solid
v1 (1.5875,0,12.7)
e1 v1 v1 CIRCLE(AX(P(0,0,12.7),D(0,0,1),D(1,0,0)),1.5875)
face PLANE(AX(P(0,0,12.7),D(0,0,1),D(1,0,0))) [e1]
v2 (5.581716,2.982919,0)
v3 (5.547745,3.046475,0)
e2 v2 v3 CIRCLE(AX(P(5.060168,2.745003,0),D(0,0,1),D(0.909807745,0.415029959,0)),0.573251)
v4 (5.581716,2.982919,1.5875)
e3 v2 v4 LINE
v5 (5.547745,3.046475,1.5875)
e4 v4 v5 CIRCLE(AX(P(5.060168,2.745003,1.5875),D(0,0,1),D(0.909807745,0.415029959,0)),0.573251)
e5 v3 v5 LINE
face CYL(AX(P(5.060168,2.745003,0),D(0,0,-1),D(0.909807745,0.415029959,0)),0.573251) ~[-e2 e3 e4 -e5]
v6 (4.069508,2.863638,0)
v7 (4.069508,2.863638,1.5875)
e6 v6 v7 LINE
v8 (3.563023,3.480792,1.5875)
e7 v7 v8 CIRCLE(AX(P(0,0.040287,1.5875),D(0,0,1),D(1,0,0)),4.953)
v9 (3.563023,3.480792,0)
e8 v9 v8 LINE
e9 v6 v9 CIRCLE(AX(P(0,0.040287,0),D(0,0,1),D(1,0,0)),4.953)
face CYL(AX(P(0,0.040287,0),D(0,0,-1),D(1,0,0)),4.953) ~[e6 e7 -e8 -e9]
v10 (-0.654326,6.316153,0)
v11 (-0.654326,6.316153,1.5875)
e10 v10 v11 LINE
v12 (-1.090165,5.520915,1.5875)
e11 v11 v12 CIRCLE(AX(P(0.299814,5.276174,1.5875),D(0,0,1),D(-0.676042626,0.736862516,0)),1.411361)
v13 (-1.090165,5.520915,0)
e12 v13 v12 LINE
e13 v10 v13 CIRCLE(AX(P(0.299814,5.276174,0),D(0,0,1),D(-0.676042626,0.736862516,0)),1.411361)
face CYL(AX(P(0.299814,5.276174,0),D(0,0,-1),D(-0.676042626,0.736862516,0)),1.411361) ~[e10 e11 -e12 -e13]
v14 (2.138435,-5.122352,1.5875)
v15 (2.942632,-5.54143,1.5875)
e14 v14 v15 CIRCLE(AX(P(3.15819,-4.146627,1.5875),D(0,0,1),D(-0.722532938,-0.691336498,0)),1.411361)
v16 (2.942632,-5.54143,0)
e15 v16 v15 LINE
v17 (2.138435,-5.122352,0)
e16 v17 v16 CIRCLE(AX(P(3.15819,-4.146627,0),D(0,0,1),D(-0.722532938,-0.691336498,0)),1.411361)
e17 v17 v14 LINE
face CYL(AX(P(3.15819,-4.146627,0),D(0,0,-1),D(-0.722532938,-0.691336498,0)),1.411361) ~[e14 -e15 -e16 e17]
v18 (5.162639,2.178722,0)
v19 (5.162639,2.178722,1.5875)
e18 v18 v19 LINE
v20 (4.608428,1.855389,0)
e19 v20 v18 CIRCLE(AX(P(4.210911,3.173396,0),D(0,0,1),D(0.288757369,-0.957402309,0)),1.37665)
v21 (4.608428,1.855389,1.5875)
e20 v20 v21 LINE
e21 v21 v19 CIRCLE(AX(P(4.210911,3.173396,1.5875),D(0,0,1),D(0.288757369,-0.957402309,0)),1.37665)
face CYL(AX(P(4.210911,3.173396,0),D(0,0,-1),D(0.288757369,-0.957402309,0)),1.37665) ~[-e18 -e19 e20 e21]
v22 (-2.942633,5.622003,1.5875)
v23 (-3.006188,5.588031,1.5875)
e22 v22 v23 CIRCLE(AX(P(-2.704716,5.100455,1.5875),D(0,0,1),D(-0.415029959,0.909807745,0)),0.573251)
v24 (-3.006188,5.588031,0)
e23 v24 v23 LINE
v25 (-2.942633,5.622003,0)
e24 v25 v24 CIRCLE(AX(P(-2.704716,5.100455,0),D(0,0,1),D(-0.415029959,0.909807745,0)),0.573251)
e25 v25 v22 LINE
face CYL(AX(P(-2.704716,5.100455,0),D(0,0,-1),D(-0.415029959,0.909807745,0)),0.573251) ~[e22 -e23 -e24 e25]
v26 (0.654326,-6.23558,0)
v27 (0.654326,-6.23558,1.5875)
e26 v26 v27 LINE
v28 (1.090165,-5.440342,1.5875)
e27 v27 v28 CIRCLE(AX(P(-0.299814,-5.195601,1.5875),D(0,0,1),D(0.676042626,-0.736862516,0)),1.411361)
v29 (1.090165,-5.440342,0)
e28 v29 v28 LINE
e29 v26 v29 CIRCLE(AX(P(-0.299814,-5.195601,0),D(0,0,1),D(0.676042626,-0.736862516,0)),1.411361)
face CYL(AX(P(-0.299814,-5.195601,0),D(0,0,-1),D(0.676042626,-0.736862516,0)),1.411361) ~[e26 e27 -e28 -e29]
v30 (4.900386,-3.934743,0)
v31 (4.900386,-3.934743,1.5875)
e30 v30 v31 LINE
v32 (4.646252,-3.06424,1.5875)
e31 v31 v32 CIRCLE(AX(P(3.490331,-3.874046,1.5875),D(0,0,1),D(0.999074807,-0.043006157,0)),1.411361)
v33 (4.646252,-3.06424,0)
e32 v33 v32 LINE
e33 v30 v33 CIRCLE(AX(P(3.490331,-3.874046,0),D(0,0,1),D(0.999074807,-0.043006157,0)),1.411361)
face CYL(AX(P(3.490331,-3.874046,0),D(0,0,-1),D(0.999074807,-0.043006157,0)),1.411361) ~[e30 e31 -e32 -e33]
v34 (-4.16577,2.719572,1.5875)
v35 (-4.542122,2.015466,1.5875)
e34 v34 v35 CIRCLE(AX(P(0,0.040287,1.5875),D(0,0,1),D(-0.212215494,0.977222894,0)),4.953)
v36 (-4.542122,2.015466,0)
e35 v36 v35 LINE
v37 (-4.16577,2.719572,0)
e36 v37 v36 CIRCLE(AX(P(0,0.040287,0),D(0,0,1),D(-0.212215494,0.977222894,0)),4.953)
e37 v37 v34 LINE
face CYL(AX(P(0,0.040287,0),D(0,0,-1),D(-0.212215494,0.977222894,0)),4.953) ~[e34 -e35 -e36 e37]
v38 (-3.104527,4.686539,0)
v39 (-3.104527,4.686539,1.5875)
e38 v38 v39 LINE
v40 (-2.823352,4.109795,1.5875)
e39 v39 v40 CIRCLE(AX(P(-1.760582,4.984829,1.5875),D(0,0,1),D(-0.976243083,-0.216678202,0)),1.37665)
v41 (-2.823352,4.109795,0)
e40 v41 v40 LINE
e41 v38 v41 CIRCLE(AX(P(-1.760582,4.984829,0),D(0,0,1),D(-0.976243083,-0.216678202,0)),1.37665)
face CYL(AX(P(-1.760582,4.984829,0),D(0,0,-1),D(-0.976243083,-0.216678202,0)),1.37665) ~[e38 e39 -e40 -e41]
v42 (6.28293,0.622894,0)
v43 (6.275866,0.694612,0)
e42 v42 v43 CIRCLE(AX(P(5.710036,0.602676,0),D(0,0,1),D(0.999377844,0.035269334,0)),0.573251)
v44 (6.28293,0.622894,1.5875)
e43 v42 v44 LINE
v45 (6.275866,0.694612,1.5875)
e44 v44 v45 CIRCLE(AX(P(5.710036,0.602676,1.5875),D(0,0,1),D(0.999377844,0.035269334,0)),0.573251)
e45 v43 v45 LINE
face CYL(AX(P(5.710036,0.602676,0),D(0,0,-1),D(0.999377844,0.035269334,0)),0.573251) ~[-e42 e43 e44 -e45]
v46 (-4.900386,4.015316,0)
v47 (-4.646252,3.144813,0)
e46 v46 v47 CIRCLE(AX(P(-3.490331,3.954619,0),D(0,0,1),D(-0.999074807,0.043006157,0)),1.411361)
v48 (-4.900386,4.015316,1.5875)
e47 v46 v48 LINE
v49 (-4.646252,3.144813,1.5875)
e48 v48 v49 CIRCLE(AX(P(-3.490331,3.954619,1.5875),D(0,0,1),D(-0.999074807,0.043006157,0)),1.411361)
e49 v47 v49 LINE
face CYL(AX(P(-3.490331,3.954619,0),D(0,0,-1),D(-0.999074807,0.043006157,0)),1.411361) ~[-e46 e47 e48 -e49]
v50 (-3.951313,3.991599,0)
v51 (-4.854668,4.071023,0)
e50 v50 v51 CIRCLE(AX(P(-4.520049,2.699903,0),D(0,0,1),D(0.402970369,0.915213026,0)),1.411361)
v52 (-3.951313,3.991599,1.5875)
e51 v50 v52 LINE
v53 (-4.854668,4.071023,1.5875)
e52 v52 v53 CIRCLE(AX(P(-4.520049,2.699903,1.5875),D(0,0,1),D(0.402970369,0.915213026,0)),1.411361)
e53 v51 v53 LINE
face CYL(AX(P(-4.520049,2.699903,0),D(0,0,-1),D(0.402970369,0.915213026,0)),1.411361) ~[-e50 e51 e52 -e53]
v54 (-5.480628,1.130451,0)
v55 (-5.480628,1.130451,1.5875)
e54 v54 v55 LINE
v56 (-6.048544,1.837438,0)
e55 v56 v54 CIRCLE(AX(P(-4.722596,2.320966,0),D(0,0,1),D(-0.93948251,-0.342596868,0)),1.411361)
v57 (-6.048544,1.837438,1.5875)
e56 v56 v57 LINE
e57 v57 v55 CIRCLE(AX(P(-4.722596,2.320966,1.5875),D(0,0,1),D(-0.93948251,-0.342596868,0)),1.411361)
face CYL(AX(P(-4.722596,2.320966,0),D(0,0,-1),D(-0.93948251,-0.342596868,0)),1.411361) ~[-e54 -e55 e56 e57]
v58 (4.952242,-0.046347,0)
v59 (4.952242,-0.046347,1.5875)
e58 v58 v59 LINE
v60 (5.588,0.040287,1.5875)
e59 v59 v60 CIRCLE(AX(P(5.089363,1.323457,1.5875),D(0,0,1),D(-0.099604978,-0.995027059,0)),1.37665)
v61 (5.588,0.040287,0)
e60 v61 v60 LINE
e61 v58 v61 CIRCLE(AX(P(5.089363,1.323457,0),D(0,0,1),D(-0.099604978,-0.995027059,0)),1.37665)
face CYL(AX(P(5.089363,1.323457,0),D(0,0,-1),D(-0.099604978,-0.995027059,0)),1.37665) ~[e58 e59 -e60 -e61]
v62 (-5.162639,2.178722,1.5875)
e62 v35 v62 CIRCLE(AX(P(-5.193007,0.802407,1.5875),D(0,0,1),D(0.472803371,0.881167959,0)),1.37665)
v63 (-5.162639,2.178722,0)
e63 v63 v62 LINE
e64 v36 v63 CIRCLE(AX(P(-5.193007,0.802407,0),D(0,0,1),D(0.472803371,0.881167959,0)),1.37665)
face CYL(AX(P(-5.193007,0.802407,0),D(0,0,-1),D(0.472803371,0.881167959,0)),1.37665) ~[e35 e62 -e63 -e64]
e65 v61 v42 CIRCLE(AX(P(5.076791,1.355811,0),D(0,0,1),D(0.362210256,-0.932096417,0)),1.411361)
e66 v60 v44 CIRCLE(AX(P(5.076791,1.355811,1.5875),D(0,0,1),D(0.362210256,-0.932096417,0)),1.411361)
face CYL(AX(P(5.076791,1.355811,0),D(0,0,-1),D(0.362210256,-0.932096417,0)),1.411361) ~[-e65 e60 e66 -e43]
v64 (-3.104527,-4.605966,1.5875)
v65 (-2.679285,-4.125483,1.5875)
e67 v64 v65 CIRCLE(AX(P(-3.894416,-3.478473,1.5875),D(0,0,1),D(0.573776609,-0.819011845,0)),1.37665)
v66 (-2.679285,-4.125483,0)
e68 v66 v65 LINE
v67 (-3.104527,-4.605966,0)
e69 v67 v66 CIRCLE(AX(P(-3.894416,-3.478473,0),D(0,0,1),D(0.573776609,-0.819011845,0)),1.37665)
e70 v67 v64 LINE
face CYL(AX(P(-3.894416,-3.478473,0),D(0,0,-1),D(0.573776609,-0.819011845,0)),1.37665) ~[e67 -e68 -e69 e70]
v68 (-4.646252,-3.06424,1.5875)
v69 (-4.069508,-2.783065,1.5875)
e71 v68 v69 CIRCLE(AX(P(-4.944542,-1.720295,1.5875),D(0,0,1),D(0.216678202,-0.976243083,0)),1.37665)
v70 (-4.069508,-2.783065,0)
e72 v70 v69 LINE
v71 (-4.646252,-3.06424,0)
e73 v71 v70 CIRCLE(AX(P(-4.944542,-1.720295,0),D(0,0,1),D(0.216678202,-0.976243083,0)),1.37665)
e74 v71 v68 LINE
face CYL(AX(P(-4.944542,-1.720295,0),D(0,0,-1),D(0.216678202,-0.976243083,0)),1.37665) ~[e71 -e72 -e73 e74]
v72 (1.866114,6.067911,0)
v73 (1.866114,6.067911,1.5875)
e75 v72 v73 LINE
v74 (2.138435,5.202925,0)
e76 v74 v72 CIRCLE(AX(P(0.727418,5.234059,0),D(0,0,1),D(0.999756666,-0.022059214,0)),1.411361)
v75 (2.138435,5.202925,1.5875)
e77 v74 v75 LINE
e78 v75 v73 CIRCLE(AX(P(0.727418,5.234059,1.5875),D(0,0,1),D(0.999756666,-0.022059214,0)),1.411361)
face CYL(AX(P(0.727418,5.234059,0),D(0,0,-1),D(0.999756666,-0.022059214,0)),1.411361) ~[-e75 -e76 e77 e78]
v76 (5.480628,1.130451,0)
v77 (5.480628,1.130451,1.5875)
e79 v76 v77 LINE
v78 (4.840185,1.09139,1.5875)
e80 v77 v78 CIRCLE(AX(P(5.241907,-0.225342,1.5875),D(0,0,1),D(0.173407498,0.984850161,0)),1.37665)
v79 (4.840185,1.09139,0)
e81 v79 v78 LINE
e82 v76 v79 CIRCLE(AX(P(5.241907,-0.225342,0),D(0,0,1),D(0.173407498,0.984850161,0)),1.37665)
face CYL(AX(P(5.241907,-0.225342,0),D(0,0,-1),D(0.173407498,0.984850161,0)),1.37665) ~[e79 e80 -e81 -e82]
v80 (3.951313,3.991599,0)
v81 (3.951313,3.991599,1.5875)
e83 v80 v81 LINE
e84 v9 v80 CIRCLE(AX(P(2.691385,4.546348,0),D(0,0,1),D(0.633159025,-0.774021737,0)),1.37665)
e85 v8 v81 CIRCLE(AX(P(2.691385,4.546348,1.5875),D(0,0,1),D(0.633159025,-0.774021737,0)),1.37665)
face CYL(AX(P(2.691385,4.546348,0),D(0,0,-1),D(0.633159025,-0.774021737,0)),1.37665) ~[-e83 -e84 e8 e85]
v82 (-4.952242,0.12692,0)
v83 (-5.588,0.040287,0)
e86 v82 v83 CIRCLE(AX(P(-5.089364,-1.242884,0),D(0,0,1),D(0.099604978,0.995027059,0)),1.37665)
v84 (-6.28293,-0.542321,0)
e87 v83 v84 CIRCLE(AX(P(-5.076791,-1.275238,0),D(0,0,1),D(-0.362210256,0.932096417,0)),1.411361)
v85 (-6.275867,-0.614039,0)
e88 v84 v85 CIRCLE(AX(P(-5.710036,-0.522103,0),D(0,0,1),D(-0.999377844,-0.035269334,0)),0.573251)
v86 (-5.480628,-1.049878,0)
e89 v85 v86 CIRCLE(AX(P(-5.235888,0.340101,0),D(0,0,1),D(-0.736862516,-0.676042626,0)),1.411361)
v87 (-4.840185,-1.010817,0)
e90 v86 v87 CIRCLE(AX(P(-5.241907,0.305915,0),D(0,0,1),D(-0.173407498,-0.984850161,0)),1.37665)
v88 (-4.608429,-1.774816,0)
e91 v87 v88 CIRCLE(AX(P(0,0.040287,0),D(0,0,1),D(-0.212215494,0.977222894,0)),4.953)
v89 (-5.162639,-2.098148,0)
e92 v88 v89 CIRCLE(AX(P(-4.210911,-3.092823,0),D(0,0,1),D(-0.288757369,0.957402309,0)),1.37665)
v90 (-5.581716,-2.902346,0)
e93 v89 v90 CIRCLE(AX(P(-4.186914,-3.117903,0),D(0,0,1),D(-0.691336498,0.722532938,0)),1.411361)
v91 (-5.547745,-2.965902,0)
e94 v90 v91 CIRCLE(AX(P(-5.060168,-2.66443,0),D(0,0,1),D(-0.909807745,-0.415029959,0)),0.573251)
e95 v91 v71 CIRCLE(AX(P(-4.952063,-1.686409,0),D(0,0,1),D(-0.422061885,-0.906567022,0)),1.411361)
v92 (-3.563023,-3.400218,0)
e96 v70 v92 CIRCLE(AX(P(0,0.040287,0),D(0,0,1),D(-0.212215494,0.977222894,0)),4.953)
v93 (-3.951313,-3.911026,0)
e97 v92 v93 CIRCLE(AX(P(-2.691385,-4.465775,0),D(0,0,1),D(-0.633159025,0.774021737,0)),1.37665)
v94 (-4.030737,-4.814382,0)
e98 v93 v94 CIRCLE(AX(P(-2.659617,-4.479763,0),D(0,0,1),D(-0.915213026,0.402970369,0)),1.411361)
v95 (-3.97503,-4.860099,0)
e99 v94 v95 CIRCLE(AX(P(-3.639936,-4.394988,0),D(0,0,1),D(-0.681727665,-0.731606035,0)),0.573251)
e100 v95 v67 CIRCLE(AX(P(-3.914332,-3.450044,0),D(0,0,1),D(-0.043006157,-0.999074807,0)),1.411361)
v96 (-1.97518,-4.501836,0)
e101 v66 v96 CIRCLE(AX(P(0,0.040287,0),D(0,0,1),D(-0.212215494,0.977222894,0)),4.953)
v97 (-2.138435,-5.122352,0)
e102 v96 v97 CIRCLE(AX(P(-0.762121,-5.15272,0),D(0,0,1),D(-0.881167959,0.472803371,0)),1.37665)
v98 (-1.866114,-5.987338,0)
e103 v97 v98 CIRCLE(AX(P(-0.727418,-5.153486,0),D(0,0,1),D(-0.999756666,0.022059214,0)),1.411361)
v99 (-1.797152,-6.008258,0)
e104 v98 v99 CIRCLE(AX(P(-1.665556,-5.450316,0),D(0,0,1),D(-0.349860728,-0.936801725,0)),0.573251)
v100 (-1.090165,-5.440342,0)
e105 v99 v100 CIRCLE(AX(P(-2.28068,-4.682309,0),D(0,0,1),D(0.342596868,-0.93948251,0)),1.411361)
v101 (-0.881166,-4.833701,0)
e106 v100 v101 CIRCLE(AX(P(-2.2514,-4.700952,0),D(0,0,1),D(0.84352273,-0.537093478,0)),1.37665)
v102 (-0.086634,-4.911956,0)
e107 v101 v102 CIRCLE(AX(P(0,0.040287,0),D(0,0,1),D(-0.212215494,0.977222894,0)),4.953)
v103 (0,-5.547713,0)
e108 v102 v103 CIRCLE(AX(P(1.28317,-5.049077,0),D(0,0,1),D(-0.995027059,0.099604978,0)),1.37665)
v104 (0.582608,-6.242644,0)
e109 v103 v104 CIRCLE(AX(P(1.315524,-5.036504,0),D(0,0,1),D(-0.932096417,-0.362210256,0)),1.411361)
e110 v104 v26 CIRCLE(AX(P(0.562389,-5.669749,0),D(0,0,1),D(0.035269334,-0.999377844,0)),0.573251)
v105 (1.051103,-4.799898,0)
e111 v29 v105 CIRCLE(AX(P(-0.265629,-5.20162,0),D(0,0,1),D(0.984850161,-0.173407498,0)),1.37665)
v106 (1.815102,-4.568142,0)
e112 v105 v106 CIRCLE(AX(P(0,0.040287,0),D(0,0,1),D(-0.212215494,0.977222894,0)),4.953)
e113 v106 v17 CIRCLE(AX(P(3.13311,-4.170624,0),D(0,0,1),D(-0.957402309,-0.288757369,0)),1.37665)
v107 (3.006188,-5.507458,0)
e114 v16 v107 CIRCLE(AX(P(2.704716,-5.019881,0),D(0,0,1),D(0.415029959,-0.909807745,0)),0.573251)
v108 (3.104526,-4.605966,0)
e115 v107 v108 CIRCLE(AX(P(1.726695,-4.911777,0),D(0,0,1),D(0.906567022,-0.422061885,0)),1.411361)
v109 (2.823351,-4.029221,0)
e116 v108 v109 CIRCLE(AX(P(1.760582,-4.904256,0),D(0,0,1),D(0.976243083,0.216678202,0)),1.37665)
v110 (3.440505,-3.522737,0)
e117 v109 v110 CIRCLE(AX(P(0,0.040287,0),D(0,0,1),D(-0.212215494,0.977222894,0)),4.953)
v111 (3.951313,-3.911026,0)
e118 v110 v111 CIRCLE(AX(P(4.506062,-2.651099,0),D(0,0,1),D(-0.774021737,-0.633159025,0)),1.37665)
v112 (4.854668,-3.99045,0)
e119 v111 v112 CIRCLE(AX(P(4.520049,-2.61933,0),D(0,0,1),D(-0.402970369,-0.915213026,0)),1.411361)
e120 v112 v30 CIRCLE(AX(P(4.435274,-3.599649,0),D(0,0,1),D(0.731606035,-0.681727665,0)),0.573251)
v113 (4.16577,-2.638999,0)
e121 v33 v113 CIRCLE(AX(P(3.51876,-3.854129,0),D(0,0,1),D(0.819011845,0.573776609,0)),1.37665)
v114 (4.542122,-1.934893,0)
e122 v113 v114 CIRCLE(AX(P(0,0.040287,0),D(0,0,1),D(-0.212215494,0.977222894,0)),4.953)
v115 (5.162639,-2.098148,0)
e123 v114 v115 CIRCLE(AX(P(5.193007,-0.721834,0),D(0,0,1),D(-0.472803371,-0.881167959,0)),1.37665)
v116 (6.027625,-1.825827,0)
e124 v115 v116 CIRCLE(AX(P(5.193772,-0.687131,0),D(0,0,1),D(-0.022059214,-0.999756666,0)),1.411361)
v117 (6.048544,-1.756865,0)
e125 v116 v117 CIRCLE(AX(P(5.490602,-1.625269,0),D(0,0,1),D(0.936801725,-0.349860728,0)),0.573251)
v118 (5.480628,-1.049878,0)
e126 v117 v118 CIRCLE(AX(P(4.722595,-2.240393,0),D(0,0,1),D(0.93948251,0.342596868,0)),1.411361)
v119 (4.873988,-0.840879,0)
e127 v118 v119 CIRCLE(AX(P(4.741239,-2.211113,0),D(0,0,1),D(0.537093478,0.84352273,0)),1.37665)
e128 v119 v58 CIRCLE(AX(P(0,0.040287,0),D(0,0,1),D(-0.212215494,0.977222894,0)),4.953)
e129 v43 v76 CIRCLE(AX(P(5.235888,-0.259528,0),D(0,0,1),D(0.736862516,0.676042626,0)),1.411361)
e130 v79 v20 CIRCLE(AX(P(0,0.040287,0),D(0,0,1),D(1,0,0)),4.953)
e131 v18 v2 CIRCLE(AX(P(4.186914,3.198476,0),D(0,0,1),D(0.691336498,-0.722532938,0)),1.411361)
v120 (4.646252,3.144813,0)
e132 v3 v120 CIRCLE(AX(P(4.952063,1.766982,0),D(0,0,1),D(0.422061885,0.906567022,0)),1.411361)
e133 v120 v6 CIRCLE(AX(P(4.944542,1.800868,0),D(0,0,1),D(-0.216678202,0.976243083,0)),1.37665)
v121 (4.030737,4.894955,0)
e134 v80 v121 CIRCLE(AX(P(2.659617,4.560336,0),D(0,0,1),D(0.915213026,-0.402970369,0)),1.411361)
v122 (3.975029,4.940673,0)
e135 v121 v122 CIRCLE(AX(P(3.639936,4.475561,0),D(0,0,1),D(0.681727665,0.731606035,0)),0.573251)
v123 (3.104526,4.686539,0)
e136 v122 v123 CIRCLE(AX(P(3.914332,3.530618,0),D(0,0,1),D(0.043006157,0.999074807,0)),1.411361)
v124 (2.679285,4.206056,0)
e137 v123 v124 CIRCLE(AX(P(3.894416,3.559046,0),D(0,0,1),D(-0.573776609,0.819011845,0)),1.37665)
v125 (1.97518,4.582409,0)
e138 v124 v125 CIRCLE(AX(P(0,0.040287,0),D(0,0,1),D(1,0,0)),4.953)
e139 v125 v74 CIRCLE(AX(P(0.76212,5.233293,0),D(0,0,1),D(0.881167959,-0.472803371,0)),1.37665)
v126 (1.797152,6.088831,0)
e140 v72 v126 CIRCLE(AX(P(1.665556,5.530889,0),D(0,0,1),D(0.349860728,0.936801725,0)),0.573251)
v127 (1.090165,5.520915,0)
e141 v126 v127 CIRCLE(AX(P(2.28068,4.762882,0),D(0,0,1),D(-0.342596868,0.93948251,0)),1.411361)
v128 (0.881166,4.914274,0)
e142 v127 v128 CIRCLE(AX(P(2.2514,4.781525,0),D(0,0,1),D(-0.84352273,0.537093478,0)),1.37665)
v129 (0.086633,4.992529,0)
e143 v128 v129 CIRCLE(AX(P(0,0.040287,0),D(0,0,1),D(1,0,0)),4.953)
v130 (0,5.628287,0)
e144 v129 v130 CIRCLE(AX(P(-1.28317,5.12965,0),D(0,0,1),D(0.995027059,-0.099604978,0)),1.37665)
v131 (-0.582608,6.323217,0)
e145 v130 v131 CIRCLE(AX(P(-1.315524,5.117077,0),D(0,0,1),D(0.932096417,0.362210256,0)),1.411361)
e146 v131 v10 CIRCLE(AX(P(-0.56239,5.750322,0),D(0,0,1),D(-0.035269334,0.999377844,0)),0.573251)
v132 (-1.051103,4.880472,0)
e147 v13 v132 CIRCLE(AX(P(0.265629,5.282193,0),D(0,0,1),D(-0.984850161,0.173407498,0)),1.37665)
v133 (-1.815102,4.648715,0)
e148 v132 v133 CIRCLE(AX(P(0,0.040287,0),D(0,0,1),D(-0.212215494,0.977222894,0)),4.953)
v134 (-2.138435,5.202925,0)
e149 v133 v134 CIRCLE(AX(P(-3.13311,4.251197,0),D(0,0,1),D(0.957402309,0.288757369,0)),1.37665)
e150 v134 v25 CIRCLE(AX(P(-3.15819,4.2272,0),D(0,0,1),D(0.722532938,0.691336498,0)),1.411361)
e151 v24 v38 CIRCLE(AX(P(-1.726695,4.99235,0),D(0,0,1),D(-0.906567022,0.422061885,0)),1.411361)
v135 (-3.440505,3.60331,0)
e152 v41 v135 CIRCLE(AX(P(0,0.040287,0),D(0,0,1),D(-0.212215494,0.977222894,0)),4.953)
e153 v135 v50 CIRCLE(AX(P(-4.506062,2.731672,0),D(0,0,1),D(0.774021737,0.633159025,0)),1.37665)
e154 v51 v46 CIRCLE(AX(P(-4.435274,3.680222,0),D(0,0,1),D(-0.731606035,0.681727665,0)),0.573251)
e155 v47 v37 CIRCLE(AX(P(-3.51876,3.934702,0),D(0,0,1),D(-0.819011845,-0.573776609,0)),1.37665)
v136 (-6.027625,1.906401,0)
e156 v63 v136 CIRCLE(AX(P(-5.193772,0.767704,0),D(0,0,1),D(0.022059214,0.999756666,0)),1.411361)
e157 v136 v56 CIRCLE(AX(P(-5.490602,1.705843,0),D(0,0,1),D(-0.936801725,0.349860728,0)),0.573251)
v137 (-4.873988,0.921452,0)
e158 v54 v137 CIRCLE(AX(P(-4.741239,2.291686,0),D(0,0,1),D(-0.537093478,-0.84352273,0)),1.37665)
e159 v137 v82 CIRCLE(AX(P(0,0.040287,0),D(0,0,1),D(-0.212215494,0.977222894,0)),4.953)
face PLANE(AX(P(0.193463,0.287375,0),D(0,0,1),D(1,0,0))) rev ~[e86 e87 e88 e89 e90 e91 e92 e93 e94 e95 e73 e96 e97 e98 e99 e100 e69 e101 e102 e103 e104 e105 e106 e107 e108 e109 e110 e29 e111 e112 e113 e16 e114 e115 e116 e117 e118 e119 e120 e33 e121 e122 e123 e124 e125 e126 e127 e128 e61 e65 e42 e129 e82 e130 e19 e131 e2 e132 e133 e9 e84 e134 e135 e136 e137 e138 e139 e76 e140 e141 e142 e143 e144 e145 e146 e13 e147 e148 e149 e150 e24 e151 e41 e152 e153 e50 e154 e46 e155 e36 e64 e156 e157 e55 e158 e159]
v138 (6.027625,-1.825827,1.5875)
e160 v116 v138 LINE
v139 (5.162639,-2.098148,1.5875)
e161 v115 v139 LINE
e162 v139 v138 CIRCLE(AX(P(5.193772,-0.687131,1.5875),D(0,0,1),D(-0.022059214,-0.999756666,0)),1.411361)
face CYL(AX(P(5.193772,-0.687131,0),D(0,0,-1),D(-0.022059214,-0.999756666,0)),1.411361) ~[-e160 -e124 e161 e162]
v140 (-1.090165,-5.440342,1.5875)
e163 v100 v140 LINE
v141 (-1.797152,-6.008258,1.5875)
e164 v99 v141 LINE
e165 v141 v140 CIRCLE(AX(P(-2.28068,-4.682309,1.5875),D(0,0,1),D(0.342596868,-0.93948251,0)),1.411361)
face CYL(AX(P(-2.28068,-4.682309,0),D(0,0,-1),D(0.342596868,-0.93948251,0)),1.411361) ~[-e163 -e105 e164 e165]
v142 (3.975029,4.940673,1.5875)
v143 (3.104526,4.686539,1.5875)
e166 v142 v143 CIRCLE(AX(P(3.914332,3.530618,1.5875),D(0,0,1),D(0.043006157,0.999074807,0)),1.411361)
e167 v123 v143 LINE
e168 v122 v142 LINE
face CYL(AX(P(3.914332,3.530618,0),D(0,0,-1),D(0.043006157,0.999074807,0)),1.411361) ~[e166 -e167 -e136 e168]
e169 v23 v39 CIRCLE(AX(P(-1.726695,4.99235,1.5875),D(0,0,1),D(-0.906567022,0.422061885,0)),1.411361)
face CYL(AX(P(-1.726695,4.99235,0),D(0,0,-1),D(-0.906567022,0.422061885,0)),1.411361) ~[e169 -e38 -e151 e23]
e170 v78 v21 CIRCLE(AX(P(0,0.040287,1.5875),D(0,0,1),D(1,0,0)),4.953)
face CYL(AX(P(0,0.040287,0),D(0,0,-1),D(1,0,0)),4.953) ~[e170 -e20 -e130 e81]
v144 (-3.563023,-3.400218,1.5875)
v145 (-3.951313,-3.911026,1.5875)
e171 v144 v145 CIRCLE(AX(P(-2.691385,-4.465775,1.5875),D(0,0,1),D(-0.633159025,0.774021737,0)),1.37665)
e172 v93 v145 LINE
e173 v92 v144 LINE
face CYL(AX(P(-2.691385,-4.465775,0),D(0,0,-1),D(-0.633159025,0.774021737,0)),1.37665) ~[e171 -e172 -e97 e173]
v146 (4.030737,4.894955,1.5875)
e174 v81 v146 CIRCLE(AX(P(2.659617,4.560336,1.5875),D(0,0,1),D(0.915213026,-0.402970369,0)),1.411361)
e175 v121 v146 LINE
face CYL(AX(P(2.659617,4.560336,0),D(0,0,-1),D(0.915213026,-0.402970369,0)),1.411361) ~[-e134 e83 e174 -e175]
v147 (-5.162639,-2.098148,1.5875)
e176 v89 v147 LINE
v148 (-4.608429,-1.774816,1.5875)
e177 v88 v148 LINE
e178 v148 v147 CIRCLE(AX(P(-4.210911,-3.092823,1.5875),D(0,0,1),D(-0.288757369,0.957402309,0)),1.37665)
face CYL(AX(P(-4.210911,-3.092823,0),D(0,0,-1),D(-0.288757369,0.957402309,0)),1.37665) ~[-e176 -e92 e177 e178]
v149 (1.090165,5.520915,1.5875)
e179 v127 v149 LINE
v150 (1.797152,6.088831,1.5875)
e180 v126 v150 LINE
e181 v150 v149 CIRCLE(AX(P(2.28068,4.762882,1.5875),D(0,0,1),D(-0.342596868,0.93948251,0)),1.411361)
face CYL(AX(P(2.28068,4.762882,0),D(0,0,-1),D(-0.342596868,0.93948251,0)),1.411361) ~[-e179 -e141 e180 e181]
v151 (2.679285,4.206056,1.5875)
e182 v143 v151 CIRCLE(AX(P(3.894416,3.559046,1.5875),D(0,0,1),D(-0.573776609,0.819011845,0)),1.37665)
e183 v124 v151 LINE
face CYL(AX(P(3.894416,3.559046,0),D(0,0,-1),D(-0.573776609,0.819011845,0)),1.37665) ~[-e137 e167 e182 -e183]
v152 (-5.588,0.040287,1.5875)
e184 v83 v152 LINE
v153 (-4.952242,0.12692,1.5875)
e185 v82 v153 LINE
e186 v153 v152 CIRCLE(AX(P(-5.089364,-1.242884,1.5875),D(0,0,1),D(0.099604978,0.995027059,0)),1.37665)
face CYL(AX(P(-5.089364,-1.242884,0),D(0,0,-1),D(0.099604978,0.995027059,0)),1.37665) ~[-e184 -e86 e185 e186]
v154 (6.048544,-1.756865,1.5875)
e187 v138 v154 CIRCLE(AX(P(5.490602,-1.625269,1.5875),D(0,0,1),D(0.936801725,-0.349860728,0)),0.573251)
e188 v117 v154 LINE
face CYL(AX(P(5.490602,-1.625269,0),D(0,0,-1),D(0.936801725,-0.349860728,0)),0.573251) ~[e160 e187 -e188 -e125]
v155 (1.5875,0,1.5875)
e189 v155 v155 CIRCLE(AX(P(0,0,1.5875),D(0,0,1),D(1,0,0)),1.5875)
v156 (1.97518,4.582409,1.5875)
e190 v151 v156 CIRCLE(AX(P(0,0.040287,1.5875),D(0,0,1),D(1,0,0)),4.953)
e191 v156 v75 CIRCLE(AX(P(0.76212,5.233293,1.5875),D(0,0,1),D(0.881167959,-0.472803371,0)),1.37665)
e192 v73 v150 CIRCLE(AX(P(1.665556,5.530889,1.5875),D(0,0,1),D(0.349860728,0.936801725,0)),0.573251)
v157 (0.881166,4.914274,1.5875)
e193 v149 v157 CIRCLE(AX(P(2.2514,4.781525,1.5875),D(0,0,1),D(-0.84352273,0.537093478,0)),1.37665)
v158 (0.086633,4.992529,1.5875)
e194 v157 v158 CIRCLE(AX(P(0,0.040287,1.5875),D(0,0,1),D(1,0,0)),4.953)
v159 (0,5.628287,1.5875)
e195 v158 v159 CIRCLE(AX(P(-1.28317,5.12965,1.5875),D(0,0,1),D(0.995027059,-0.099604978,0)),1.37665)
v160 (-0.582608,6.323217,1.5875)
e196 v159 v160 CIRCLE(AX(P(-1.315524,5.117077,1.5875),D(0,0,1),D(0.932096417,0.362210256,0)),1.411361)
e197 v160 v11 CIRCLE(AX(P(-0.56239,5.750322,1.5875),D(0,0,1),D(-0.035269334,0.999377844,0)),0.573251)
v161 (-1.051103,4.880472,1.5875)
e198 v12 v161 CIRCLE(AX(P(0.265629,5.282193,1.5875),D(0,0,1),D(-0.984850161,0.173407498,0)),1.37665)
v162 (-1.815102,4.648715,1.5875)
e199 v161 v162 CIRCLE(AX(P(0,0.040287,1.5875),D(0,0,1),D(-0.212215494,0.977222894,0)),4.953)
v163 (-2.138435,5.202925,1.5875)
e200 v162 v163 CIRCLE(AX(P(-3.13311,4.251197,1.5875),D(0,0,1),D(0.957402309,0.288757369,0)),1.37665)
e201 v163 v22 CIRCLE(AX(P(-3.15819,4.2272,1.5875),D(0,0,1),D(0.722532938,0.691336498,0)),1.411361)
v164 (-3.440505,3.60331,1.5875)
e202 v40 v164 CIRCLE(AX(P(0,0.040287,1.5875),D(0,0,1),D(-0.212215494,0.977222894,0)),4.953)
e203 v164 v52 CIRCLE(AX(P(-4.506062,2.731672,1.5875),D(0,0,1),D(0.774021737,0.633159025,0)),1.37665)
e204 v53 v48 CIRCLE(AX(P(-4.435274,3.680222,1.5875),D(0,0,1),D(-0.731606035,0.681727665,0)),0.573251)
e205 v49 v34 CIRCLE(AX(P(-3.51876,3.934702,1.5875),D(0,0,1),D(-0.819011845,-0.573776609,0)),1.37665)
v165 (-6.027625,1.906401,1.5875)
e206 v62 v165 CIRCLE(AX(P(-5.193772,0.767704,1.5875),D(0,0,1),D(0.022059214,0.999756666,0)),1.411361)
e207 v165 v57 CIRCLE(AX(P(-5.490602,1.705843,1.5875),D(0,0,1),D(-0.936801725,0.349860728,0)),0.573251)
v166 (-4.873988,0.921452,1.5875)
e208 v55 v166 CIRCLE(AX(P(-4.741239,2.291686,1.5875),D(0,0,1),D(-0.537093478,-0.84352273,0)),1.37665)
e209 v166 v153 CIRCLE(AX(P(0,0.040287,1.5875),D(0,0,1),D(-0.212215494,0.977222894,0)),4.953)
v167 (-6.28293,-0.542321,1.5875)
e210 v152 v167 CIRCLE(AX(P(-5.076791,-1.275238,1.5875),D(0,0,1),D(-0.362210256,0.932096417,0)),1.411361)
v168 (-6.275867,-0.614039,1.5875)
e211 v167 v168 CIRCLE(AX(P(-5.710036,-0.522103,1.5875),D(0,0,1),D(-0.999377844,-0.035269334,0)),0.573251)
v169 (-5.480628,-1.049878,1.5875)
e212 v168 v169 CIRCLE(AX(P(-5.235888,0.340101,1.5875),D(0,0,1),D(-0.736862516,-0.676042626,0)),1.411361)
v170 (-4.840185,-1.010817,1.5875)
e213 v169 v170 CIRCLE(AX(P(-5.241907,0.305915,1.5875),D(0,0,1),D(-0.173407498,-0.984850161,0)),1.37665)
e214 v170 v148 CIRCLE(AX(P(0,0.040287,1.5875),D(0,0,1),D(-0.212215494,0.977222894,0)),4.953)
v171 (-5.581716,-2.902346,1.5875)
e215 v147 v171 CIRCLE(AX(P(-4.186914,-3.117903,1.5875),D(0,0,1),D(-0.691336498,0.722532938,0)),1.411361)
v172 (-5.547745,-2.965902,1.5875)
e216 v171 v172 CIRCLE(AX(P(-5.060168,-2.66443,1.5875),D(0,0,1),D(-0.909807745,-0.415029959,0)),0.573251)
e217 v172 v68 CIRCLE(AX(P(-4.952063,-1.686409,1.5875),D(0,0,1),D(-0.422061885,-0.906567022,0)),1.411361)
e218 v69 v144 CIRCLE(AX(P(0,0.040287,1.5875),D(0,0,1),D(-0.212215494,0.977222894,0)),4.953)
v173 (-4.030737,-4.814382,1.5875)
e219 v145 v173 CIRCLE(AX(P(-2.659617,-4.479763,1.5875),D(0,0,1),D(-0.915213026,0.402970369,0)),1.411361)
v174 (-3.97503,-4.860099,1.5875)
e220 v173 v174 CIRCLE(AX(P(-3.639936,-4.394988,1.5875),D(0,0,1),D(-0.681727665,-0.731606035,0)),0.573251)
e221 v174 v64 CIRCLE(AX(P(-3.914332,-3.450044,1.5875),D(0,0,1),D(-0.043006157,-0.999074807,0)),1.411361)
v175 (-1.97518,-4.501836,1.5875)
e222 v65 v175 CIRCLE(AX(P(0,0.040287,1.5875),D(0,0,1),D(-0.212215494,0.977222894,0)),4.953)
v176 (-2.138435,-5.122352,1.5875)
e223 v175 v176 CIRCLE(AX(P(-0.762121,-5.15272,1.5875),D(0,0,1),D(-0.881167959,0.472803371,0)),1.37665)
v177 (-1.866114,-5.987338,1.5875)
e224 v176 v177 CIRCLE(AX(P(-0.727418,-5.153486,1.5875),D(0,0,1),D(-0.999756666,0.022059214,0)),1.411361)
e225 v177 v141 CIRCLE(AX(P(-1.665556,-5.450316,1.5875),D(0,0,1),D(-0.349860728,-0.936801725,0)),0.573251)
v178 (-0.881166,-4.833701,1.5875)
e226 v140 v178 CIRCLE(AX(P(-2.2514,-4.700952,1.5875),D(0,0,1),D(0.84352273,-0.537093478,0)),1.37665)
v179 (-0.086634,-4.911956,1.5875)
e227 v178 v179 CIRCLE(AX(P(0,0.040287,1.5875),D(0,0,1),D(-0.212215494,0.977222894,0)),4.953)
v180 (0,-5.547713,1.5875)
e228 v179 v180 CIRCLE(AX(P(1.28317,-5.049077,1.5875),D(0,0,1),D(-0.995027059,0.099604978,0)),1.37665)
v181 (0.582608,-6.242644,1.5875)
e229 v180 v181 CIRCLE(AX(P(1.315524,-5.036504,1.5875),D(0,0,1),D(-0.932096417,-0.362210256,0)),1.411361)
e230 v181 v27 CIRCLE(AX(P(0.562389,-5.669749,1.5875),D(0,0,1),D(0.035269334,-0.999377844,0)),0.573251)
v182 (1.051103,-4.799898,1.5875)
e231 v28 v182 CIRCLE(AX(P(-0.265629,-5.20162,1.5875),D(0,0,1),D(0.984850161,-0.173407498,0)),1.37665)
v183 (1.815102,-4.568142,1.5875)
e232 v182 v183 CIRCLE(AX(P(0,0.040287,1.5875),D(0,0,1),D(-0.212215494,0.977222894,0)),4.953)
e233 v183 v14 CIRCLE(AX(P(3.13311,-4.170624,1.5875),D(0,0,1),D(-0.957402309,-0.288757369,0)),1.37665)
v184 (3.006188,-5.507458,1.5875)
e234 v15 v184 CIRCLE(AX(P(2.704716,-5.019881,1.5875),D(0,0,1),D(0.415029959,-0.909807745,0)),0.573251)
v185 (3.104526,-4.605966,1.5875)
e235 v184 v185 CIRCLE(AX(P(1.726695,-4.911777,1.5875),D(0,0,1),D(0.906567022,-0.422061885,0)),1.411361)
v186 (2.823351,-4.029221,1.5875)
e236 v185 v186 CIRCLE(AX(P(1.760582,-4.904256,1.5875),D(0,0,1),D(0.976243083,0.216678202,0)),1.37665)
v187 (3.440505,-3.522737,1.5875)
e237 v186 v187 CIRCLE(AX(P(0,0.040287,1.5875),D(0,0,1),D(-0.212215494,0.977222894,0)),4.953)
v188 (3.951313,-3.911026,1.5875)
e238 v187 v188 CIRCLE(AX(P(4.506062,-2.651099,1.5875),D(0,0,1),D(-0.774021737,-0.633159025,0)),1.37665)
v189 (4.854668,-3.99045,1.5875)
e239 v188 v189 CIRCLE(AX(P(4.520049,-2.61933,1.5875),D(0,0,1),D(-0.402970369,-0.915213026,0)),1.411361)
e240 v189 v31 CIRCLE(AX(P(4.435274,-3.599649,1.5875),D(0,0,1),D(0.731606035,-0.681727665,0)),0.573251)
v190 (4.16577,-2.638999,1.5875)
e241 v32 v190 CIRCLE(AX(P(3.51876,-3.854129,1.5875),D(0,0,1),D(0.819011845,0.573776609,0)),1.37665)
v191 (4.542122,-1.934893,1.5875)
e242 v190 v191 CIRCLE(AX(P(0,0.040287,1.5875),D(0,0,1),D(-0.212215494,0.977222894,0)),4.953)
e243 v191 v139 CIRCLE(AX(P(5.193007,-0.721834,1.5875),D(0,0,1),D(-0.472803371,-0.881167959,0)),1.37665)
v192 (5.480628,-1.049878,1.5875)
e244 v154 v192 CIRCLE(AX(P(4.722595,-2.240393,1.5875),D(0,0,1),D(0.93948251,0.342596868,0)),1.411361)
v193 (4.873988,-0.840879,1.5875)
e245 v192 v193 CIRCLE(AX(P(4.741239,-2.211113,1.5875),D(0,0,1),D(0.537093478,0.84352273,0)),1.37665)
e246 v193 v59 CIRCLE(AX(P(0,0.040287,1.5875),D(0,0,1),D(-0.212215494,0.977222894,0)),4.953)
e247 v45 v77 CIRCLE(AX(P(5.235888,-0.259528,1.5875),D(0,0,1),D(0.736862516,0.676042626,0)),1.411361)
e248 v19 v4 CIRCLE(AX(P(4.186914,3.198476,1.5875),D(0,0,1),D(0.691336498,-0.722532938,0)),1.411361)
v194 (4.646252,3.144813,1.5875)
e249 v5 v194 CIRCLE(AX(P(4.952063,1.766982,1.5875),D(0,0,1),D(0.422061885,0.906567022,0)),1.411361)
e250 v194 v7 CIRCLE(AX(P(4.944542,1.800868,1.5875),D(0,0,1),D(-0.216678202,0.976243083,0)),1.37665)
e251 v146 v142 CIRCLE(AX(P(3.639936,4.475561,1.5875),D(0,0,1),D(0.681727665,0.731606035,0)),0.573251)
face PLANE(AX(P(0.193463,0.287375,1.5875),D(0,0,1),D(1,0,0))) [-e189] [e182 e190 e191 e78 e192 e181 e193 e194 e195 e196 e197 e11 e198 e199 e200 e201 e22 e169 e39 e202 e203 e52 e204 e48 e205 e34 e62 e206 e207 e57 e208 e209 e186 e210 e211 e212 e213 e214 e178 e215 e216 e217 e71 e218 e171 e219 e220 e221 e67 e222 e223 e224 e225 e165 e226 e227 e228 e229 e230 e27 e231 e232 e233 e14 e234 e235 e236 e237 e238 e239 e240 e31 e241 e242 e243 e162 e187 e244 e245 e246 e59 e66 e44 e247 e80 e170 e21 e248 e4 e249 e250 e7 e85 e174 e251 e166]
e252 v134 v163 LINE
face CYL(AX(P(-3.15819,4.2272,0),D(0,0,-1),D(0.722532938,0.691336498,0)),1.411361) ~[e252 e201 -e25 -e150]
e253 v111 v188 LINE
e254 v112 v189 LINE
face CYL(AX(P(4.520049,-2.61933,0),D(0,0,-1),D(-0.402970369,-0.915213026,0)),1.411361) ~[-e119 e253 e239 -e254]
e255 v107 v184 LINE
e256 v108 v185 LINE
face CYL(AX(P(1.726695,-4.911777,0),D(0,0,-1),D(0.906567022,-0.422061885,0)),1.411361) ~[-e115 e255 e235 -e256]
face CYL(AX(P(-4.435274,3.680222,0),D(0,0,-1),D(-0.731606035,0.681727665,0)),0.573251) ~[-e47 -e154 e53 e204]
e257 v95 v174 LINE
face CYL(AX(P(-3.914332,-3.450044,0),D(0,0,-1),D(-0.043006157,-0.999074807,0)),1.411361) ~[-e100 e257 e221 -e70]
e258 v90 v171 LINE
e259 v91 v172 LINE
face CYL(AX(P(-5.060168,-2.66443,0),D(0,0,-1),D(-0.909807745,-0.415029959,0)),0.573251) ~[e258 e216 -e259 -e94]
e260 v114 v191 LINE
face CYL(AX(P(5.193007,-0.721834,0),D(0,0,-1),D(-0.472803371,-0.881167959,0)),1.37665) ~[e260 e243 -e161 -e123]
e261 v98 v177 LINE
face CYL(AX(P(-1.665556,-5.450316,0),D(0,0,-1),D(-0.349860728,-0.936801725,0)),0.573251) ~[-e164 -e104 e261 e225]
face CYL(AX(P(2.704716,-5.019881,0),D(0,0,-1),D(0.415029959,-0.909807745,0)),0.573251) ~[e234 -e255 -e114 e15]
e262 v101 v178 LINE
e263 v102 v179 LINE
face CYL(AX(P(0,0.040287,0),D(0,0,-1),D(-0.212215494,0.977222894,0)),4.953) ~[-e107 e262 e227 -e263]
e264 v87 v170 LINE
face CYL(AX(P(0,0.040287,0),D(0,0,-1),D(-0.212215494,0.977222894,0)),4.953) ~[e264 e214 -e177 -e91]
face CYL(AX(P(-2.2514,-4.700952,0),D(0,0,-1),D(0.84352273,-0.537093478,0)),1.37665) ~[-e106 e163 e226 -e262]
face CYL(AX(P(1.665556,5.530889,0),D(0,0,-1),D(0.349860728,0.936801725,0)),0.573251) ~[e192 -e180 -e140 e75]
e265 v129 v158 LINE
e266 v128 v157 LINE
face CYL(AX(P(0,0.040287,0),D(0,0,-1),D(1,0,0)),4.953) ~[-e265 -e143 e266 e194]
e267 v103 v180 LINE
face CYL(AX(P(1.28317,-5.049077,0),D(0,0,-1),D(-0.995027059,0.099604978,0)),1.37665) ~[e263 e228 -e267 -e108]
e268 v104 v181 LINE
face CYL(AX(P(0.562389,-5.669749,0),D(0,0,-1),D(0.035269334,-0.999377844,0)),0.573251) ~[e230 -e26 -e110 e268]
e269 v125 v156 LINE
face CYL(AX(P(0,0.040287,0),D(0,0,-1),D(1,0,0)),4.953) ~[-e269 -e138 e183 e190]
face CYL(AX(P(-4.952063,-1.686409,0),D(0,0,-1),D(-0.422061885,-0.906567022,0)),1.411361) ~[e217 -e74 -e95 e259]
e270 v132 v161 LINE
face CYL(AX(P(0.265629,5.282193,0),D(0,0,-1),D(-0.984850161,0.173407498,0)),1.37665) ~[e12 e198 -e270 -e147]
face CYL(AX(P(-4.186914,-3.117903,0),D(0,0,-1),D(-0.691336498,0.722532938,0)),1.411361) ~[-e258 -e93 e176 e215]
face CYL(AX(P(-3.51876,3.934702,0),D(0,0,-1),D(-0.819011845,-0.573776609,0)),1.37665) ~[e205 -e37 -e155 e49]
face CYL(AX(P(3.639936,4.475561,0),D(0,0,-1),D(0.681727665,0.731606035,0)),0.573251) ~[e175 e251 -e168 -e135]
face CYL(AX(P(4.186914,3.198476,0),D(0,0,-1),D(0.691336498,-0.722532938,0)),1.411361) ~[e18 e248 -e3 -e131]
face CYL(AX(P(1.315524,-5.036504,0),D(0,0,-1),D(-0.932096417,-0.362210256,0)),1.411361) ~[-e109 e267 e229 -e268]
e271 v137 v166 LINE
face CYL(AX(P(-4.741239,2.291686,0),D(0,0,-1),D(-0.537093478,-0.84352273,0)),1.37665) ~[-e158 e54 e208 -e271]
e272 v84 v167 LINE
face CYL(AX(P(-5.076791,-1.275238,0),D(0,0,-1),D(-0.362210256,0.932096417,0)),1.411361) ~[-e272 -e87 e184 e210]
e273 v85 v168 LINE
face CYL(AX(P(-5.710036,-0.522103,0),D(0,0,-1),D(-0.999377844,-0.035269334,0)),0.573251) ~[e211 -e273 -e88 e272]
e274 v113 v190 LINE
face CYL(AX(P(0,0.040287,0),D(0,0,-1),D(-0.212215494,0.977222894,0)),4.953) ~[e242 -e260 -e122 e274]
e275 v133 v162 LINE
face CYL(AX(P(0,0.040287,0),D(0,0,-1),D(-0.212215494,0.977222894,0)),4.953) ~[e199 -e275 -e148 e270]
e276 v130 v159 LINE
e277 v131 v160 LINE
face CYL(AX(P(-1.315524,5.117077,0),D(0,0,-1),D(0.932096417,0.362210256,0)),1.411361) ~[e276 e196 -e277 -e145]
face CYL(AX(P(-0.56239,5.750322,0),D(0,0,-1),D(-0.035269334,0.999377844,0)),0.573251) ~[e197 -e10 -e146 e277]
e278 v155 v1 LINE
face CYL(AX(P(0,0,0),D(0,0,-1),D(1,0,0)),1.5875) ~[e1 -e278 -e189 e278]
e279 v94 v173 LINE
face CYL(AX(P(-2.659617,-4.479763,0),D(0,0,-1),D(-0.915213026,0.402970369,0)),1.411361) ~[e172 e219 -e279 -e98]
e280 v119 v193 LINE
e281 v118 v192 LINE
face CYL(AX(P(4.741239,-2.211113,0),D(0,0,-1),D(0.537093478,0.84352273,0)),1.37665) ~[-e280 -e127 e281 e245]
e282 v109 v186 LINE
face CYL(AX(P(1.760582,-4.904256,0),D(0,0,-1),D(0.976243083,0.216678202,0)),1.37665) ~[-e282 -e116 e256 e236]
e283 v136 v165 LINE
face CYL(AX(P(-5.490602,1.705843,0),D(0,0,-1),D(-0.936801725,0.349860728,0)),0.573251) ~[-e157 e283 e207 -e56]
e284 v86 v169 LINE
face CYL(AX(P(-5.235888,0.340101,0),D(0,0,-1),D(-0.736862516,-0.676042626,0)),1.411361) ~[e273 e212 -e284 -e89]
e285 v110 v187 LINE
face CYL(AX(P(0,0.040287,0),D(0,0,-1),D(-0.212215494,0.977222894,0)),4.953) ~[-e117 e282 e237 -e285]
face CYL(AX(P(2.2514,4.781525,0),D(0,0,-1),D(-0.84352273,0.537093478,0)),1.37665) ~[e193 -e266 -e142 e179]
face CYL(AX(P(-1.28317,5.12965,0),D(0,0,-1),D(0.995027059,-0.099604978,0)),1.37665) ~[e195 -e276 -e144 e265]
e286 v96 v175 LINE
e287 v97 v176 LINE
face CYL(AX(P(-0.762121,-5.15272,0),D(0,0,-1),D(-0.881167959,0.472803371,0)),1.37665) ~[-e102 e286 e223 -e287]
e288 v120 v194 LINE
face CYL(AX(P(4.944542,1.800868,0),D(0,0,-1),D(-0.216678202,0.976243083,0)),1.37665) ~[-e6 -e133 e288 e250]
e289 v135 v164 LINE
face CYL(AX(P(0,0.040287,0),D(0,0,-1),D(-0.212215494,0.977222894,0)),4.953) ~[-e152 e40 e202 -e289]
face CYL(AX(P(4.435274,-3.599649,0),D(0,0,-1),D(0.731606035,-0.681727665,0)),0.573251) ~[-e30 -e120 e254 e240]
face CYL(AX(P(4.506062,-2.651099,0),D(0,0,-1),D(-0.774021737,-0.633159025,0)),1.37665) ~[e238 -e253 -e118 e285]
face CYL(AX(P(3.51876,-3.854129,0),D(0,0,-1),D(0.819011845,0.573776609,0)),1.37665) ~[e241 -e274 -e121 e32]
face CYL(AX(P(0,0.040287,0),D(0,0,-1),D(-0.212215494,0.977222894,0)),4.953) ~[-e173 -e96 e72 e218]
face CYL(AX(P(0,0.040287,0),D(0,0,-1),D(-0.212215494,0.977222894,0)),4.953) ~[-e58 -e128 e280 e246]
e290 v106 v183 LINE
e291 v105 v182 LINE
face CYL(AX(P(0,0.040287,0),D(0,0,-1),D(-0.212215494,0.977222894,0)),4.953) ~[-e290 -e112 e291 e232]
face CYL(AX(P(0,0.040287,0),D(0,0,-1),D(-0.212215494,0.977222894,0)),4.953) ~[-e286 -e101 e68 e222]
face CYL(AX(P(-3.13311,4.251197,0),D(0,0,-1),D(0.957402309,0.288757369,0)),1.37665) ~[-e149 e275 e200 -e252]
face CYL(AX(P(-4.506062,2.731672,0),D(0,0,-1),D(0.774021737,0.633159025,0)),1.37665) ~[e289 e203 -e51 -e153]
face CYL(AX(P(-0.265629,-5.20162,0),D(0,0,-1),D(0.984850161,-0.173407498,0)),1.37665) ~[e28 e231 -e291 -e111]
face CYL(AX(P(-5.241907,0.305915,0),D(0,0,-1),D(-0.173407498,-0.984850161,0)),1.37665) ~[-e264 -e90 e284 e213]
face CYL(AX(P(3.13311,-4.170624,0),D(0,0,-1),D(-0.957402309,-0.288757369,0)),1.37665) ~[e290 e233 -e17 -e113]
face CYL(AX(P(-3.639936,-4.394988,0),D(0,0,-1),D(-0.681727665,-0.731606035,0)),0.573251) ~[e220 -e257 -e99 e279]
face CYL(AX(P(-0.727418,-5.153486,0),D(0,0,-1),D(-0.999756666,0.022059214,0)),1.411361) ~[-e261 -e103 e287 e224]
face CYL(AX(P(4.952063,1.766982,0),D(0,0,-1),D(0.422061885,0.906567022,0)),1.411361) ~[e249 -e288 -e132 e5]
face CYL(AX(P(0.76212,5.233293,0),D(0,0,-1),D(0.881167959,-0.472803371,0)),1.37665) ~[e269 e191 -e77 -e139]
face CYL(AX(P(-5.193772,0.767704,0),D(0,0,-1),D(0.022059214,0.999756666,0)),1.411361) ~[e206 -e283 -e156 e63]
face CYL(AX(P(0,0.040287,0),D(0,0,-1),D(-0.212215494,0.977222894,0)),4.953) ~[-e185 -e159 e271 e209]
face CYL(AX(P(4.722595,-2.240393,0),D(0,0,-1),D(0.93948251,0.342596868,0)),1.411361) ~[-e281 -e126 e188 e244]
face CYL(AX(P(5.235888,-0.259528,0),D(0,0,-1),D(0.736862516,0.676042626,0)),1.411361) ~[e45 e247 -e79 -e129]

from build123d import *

# Parameters (mm, degrees)
F1_DEPTH = 1.5875
F2_COUNT = 16
F0_R     = 1.5875
F3_DEPTH = 1.5875
F4_DEPTH = 12.7


# Not quite as in the source:
# - a length typed as a fraction of an inch, garbled in the dataset ("3 / 203.2 mm" for 3/8 in), is restored


with BuildPart() as f1:
    # F0 (on Top) → F1 (new body)
    with BuildSketch(Plane.XY):
        with BuildLine():
            ThreePointArc((-1.051103421, 4.8804715195), (-0.4854789746, 4.9694364781), (0.0866333591, 4.9925288117))
            ThreePointArc((0.0866333591, 4.9925288117), (0.0808731678, 5.3155254225), (-7.85e-08, 5.6282865269))
            ThreePointArc((-7.85e-08, 5.6282865269), (-0.2339701384, 6.0238183846), (-0.5826076907, 6.3232166086))
            ThreePointArc((-0.5826076907, 6.3232166086), (-0.6185779348, 6.3208129001), (-0.6543259611, 6.3161529755))
            ThreePointArc((-0.6543259611, 6.3161529755), (-0.9378548446, 5.954491792), (-1.0901647979, 5.5209146738))
            ThreePointArc((-1.0901647979, 5.5209146738), (-1.108467423, 5.1983855986), (-1.051103421, 4.8804715195))
        make_face()
    extrude(amount=F1_DEPTH)


with BuildPart() as f2_1:
    # F2: instance of F1
    add(f1.part.rotate(Axis((-7.85e-08, 0.0402865269, 0), (0, 0, 1)), 1 * 360 / F2_COUNT))


with BuildPart() as f2_2:
    # F2: instance of F1
    add(f1.part.rotate(Axis((-7.85e-08, 0.0402865269, 0), (0, 0, 1)), 2 * 360 / F2_COUNT))


with BuildPart() as f2_3:
    # F2: instance of F1
    add(f1.part.rotate(Axis((-7.85e-08, 0.0402865269, 0), (0, 0, 1)), 3 * 360 / F2_COUNT))


with BuildPart() as f2_4:
    # F2: instance of F1
    add(f1.part.rotate(Axis((-7.85e-08, 0.0402865269, 0), (0, 0, 1)), 4 * 360 / F2_COUNT))


with BuildPart() as f2_5:
    # F2: instance of F1
    add(f1.part.rotate(Axis((-7.85e-08, 0.0402865269, 0), (0, 0, 1)), 5 * 360 / F2_COUNT))


with BuildPart() as f2_6:
    # F2: instance of F1
    add(f1.part.rotate(Axis((-7.85e-08, 0.0402865269, 0), (0, 0, 1)), 6 * 360 / F2_COUNT))


with BuildPart() as f2_7:
    # F2: instance of F1
    add(f1.part.rotate(Axis((-7.85e-08, 0.0402865269, 0), (0, 0, 1)), 7 * 360 / F2_COUNT))


with BuildPart() as f2_8:
    # F2: instance of F1
    add(f1.part.rotate(Axis((-7.85e-08, 0.0402865269, 0), (0, 0, 1)), 8 * 360 / F2_COUNT))


with BuildPart() as f2_9:
    # F2: instance of F1
    add(f1.part.rotate(Axis((-7.85e-08, 0.0402865269, 0), (0, 0, 1)), 9 * 360 / F2_COUNT))


with BuildPart() as f2_10:
    # F2: instance of F1
    add(f1.part.rotate(Axis((-7.85e-08, 0.0402865269, 0), (0, 0, 1)), 10 * 360 / F2_COUNT))


with BuildPart() as f2_11:
    # F2: instance of F1
    add(f1.part.rotate(Axis((-7.85e-08, 0.0402865269, 0), (0, 0, 1)), 11 * 360 / F2_COUNT))


with BuildPart() as f2_12:
    # F2: instance of F1
    add(f1.part.rotate(Axis((-7.85e-08, 0.0402865269, 0), (0, 0, 1)), 12 * 360 / F2_COUNT))


with BuildPart() as f2_13:
    # F2: instance of F1
    add(f1.part.rotate(Axis((-7.85e-08, 0.0402865269, 0), (0, 0, 1)), 13 * 360 / F2_COUNT))


with BuildPart() as f2_14:
    # F2: instance of F1
    add(f1.part.rotate(Axis((-7.85e-08, 0.0402865269, 0), (0, 0, 1)), 14 * 360 / F2_COUNT))


with BuildPart() as f2_15:
    # F2: instance of F1
    add(f1.part.rotate(Axis((-7.85e-08, 0.0402865269, 0), (0, 0, 1)), 15 * 360 / F2_COUNT))


with BuildPart() as f1_1:
    add(f1.part)

    add(f2_1.part)  # F3 merges F2_1

    add(f2_2.part)  # F3 merges F2_2

    add(f2_3.part)  # F3 merges F2_3

    add(f2_4.part)  # F3 merges F2_4

    add(f2_5.part)  # F3 merges F2_5

    add(f2_6.part)  # F3 merges F2_6

    add(f2_7.part)  # F3 merges F2_7

    add(f2_8.part)  # F3 merges F2_8

    add(f2_9.part)  # F3 merges F2_9

    add(f2_10.part)  # F3 merges F2_10

    add(f2_11.part)  # F3 merges F2_11

    add(f2_12.part)  # F3 merges F2_12

    add(f2_13.part)  # F3 merges F2_13

    add(f2_14.part)  # F3 merges F2_14

    add(f2_15.part)  # F3 merges F2_15
    # F0 (on Top) → F3 (join)
    with BuildSketch(Plane.XY):
        with BuildLine():
            ThreePointArc((-1.051103421, 4.8804715195), (-3.1085442832, -3.815768702), (4.9529999215, 0.0402865269))
            ThreePointArc((4.9529999215, 0.0402865269), (3.5327965769, 3.511821748), (0.0866333591, 4.9925288117))
            ThreePointArc((0.0866333591, 4.9925288117), (-0.4854789746, 4.9694364781), (-1.051103421, 4.8804715195))
        make_face()
        Circle(F0_R, mode=Mode.SUBTRACT)
    extrude(amount=F3_DEPTH)

    # F0 (on Top) → F4 (join)
    with BuildSketch(Plane.XY):
        Circle(F0_R)
    extrude(amount=F4_DEPTH)


solid = f1_1.part
